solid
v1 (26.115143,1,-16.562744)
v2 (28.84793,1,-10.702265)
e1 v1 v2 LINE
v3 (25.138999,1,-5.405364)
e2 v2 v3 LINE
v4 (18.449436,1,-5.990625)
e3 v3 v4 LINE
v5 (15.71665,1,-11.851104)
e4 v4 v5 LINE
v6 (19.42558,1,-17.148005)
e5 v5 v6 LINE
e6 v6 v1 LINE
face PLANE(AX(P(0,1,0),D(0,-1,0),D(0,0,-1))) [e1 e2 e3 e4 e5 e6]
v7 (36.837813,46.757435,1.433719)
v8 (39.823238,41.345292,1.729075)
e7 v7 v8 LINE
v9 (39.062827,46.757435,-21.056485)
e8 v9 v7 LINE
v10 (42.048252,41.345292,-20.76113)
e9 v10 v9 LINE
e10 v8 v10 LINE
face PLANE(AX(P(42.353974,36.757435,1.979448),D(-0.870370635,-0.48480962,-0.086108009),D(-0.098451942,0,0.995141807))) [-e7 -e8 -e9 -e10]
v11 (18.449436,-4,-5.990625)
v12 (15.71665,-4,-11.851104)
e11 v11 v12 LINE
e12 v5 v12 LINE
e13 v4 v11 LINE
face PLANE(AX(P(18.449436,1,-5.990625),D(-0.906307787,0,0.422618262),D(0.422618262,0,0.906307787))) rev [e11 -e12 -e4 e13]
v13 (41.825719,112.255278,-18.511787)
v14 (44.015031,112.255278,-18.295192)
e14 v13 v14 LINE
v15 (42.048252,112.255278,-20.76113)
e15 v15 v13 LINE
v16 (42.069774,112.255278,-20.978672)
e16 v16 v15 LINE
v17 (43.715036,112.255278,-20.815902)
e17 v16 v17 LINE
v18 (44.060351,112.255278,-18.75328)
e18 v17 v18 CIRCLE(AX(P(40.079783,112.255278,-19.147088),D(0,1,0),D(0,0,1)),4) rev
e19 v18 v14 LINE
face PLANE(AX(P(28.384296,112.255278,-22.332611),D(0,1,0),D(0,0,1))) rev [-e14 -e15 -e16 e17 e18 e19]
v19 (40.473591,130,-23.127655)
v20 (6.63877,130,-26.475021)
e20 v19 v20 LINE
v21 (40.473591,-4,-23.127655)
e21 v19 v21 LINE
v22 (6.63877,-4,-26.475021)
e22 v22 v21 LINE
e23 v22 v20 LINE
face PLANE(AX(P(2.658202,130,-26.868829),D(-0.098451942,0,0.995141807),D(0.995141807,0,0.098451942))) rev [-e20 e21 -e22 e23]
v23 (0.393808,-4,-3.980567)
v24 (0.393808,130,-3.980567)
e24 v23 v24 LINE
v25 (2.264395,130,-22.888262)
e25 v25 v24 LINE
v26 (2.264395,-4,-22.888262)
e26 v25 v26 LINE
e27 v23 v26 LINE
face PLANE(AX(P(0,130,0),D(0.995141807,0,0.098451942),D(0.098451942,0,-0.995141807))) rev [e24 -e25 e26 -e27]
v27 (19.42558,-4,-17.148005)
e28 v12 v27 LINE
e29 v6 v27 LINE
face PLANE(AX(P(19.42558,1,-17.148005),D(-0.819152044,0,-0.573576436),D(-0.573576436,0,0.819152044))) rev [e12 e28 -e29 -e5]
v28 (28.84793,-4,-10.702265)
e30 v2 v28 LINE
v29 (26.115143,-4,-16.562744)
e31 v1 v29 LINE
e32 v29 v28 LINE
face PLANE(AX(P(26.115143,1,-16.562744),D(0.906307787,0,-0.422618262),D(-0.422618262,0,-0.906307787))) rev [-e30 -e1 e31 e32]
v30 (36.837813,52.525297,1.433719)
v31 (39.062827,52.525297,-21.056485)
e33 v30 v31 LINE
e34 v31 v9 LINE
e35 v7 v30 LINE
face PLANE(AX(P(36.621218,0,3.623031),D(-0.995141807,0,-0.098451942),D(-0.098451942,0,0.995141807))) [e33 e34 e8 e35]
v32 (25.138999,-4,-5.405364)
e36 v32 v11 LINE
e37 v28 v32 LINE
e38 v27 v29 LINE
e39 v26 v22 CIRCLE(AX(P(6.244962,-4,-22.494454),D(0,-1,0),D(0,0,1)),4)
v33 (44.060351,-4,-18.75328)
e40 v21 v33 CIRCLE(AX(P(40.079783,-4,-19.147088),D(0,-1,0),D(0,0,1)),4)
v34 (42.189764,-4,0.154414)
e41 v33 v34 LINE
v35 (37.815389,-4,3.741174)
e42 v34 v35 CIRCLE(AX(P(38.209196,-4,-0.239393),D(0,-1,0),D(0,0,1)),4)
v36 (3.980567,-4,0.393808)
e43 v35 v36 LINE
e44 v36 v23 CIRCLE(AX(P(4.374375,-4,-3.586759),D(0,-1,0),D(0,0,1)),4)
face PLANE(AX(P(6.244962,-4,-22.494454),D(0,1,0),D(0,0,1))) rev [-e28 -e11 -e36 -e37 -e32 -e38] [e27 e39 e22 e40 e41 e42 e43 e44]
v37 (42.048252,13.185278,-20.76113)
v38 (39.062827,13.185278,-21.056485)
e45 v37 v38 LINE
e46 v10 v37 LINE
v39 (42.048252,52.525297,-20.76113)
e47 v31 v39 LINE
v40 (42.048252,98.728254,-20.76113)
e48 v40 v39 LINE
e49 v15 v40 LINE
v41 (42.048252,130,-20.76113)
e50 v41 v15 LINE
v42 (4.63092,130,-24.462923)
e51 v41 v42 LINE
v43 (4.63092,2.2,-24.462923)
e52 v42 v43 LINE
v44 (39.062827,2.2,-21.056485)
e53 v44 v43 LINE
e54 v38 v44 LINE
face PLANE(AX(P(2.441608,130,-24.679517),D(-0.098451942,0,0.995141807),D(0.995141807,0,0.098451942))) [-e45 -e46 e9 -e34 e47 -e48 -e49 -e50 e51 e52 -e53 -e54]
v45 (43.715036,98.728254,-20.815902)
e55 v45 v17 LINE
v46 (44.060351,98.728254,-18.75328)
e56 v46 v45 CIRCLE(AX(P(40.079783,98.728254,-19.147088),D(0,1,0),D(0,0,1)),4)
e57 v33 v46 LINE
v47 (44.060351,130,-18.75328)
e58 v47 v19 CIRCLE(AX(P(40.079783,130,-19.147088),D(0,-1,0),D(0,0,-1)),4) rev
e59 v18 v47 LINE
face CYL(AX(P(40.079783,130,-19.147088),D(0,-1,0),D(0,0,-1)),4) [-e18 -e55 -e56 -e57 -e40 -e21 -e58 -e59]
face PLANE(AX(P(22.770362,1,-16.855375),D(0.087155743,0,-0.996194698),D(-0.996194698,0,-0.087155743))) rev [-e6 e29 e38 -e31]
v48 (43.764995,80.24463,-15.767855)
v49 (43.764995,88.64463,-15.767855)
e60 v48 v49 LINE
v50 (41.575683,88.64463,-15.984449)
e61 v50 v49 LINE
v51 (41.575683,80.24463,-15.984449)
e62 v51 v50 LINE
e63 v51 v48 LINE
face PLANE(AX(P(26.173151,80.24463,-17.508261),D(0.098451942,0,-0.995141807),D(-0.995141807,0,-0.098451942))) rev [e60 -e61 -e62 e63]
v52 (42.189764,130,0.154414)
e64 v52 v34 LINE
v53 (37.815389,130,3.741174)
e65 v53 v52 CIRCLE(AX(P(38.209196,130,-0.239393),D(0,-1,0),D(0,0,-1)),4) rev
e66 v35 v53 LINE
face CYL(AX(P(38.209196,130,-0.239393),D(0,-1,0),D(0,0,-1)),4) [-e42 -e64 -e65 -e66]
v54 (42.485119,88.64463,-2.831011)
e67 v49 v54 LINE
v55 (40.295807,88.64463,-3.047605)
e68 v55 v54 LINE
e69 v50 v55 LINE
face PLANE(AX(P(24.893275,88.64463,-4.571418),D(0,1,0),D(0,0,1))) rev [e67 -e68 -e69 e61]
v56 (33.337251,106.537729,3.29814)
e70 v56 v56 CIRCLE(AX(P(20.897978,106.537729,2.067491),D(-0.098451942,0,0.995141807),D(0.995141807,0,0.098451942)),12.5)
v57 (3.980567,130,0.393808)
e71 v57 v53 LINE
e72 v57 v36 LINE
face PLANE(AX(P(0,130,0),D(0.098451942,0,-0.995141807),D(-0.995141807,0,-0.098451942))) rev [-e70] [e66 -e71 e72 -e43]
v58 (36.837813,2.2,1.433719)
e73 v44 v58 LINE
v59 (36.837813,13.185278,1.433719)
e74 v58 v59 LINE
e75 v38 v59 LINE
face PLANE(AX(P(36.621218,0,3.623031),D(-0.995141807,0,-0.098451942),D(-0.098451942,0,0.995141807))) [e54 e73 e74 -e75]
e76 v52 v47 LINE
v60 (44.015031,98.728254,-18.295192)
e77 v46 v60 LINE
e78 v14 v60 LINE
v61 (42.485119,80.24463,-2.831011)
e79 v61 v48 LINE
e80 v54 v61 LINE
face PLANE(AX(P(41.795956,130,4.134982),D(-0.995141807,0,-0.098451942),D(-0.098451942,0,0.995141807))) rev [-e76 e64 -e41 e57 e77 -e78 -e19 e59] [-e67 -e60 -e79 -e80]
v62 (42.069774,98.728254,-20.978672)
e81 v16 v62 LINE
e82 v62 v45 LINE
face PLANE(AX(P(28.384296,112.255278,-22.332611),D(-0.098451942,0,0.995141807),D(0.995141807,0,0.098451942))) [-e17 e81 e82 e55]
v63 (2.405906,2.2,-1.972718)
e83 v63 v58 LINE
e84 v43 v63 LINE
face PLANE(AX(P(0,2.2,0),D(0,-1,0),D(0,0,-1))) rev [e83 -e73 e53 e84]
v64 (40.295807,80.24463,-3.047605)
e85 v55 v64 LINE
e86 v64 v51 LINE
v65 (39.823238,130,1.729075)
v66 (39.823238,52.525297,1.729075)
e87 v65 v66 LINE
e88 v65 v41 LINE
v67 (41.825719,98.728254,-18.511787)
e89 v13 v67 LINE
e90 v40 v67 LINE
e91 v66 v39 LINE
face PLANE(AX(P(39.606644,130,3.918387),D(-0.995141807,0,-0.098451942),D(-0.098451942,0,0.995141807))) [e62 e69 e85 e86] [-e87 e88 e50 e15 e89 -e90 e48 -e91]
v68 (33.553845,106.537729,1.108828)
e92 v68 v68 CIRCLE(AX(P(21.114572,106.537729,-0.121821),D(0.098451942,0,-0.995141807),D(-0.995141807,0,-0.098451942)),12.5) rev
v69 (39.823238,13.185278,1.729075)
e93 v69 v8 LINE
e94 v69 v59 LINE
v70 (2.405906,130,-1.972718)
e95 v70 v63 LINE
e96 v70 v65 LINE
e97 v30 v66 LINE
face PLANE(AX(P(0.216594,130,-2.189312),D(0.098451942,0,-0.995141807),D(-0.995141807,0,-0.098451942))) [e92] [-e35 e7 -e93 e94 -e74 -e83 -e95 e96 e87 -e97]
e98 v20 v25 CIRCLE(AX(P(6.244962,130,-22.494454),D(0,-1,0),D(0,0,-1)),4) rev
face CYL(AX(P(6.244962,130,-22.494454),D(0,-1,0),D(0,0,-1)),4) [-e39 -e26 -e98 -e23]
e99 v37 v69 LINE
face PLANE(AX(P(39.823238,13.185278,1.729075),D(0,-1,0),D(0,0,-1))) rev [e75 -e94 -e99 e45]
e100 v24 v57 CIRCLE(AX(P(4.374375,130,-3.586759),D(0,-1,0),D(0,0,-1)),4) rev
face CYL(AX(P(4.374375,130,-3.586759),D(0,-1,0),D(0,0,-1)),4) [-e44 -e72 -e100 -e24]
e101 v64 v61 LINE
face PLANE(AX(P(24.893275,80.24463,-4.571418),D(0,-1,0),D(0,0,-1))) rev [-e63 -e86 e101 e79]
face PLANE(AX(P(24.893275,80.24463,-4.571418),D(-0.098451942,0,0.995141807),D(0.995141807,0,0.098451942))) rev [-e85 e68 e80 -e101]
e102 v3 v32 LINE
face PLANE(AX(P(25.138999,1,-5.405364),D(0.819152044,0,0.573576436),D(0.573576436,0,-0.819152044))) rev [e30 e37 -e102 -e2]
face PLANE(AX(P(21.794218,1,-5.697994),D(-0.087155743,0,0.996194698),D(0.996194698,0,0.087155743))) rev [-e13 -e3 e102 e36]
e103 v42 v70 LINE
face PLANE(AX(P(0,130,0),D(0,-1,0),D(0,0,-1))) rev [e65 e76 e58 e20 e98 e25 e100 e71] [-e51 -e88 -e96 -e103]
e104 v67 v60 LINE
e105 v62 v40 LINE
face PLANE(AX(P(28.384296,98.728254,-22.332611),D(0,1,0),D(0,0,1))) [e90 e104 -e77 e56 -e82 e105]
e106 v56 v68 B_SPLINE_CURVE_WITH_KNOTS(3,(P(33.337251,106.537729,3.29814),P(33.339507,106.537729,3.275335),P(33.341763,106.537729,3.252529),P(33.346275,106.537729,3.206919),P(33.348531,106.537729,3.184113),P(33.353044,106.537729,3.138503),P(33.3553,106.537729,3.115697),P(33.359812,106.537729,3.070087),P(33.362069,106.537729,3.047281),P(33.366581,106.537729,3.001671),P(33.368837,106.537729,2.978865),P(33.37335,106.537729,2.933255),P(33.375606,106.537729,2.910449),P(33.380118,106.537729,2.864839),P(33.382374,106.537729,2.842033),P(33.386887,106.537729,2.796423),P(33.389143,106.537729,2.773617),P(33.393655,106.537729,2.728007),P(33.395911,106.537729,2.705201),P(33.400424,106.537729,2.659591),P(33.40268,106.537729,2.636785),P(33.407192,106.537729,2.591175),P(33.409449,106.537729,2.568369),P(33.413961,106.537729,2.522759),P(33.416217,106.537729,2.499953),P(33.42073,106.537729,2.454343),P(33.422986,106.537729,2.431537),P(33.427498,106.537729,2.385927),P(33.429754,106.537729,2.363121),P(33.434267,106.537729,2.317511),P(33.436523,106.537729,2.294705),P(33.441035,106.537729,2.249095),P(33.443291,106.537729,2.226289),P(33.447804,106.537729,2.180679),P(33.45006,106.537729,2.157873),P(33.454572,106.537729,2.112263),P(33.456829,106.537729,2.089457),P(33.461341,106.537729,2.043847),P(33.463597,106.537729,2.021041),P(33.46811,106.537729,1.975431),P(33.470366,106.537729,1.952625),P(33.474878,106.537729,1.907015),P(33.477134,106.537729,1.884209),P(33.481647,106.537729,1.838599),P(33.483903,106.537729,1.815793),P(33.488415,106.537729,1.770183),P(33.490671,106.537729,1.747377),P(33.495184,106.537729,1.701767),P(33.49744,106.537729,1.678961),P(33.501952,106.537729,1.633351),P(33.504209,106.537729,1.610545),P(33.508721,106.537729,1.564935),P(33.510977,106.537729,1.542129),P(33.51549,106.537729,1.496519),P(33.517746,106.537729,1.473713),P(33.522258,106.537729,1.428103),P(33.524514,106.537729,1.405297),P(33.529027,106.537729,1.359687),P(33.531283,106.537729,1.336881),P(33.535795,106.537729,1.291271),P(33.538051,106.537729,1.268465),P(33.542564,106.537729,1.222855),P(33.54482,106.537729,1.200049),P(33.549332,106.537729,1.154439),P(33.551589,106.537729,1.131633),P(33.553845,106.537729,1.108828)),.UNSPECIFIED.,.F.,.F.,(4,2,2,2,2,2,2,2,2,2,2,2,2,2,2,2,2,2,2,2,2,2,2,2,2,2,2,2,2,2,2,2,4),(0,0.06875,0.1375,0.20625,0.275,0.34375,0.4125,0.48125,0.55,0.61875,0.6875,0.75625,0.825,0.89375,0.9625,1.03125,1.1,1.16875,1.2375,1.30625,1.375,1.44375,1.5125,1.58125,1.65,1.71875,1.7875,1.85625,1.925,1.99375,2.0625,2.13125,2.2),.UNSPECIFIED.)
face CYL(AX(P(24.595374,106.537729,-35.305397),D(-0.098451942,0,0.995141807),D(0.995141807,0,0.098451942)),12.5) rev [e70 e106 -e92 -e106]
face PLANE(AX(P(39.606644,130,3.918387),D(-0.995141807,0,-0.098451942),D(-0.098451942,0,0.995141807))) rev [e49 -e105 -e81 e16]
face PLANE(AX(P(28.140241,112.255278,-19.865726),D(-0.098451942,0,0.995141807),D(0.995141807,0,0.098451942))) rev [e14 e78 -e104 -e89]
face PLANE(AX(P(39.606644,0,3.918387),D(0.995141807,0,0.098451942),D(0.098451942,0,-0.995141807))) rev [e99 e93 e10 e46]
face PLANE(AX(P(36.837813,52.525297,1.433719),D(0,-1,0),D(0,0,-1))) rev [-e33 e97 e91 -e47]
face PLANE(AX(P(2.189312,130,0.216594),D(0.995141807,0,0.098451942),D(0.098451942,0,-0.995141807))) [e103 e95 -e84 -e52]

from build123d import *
from build123d.topology import SkipClean

# Parameters (mm, degrees)
BOSS_EXTRUDE1_DEPTH = 130
SHELL1_T            = -2.2
SKETCH3_W           = 13
SKETCH3_H           = 8.4
CUT_EXTRUDE1_DEPTH  = 2.2
SKETCH6_W           = 2.478928052
SKETCH6_H           = 13.527023683
CUT_EXTRUDE2_DEPTH  = 2.2
SKETCH4_R           = 12.5
CUT_EXTRUDE3_DEPTH  = 2.2
FILLET1_R           = 4
SKETCH7_W           = 22.6
SKETCH7_H           = 50.325296996
BOSS_EXTRUDE2_DEPTH = 3
SKETCH8_W           = 22.6
SKETCH8_H           = 23.572157484
CUT_EXTRUDE4_DEPTH  = 3
CHAMFER1_SIZE       = 10
CHAMFER1_SIZE_2     = 5.543090515
BOSS_EXTRUDE3_START = 4
BOSS_EXTRUDE3_DEPTH = 4
CUT_EXTRUDE5_DEPTH  = 5


with BuildPart() as part:
    # Sketch1 → Boss-Extrude1 (new body)
    with BuildSketch(Plane(origin=(0, 0, 0), x_dir=(1, 0, 0), z_dir=(0, 1, 0))):
        Polygon((0, 0), (41.795955874, -4.134981567), (44.45415831, 22.733847209), (2.658202436, 26.868828776), align=None)
    extrude(amount=BOSS_EXTRUDE1_DEPTH)

    # Shell1
    shell1_openings = [part.faces().sort_by_distance(p)[0] for p in [
        (22.227079155, 130, -11.366923605),
    ]]
    offset(amount=SHELL1_T, openings=shell1_openings, kind=Kind.INTERSECTION)

    # Sketch3 → Cut-Extrude1 (cut)
    with BuildSketch(Plane(origin=(41.795955874, 0, 4.134981567), x_dir=(0.09845194207530276, 0, -0.9951418065288994), z_dir=(0.9951418065288994, 0, 0.09845194207530276))):
        with Locations((13.5, 84.444630111)):
            Rectangle(SKETCH3_W, SKETCH3_H)
    extrude(amount=-CUT_EXTRUDE1_DEPTH, mode=Mode.SUBTRACT)

    # Sketch6 → Cut-Extrude2 (cut)
    with BuildSketch(Plane(origin=(41.795955874, 0, 4.134981567), x_dir=(0.09845194207530188, 0, -0.9951418065288994), z_dir=(0.9951418065288995, 0, 0.09845194207530189))):
        with Locations((23.779140081, 105.491766173)):
            Rectangle(SKETCH6_W, SKETCH6_H)
    extrude(amount=-CUT_EXTRUDE2_DEPTH, mode=Mode.SUBTRACT)

    # Sketch4 → Cut-Extrude3 (cut)
    with BuildSketch(Plane(origin=(0, 0, 0), x_dir=(0.9951418065288994, 0, 0.0984519420753021), z_dir=(-0.09845194207530208, 0, 0.9951418065288993))):
        with Locations((21, 106.537728643)):
            Circle(SKETCH4_R)
    extrude(amount=-CUT_EXTRUDE3_DEPTH, mode=Mode.SUBTRACT)

    # Fillet1
    # the kernel refuses this fillet: 4 mm, written as the material it takes off along each edge
    with BuildSketch(Plane(origin=(2.658202436, -10, -26.868828776), x_dir=(-0.0984519420753019, 0, 0.9951418065288995), z_dir=(0, 1, 0)), Plane(origin=(0, -10, 0), x_dir=(0.9951418065288994, 0, 0.09845194207530183), z_dir=(0, 1, 0))) as fillet1_piece_1:
        with BuildLine():
            CenterArc((FILLET1_R, FILLET1_R), FILLET1_R, 180, 90)
            Line((0, FILLET1_R), (0, 0))
            Line((0, 0), (FILLET1_R, 0))
        make_face()
    extrude(amount=150, mode=Mode.SUBTRACT)
    with BuildSketch(Plane(origin=(44.45415831, -10, -22.733847209), x_dir=(-0.09845194207530218, 0, 0.9951418065288994), z_dir=(0, 1, 0)), Plane(origin=(41.795955874, -10, 4.134981567), x_dir=(-0.9951418065288994, 0, -0.09845194207530182), z_dir=(0, 1, 0))) as fillet1_piece_2:
        with BuildLine():
            CenterArc((FILLET1_R, -FILLET1_R), FILLET1_R, 90, 90)
            Line((0, -FILLET1_R), (0, 0))
            Line((0, 0), (FILLET1_R, 0))
        make_face()
    extrude(amount=150, mode=Mode.SUBTRACT)

    # Sketch7 → Boss-Extrude2 (add)
    with BuildSketch(Plane(origin=(39.6066439, 0, 3.918387295), x_dir=(-0.09845194207530197, 0, 0.9951418065288994), z_dir=(-0.9951418065288995, 0, -0.09845194207530199))):
        with Locations((-13.5, 27.362648498)):
            Rectangle(SKETCH7_W, SKETCH7_H)
    extrude(amount=BOSS_EXTRUDE2_DEPTH)

    # Sketch8 → Cut-Extrude4 (cut)
    with BuildSketch(Plane(origin=(36.62121848, 0, 3.623031468), x_dir=(-0.09845194207530192, 0, 0.9951418065288994), z_dir=(-0.9951418065288995, 0, -0.09845194207530193))):
        with Locations((-13.5, 24.971356382)):
            Rectangle(SKETCH8_W, SKETCH8_H)
    extrude(amount=-CUT_EXTRUDE4_DEPTH, mode=Mode.SUBTRACT)

    # Chamfer1
    # the kernel refuses this chamfer: 10, 5.543090515 mm, written as the material it takes off along each edge
    with BuildSketch(Plane(origin=(36.837812753, 36.757435124, 1.433719494), x_dir=(-0.018642579535210594, 0.9998245108869491, -0.0018443584105231356), z_dir=(0.09845194207530193, 0, -0.9951418065288995))) as chamfer1_piece_1_section:
        Polygon((CHAMFER1_SIZE * 0.999824510887, CHAMFER1_SIZE * 0.0187335909444), (-CHAMFER1_SIZE_2 * 0.0187335909428, CHAMFER1_SIZE_2 * 0.999824510802), (0, 0), align=None)
    chamfer1_piece_1 = extrude(amount=22.6, mode=Mode.PRIVATE)
    chamfer1_piece_1 = split(chamfer1_piece_1, bisect_by=Plane(origin=(40.104235357, 40.578335675, -1.111214466), z_dir=(-0.9951418065288995, 0, -0.09845194207530193)), keep=Keep.TOP, mode=Mode.PRIVATE)
    add(chamfer1_piece_1, mode=Mode.SUBTRACT)

    # Sketch9 → Boss-Extrude3 (add)
    with BuildSketch(Plane.XZ.offset(BOSS_EXTRUDE3_START)):
        with BuildLine():
            Line((6.638769662, -26.475021008), (40.473591084, -23.127654977))
            ThreePointArc((40.473591084, -23.127654977), (43.172933538, -21.683309686), (44.060350542, -18.753279983))
            Line((44.060350542, -18.753279983), (42.189763643, 0.154414341))
            ThreePointArc((42.189763643, 0.154414341), (40.745418352, 2.853756795), (37.815388648, 3.741173799))
            Line((37.815388648, 3.741173799), (3.980567226, 0.393807768))
            ThreePointArc((3.980567226, 0.393807768), (1.281224772, -1.050537523), (0.393807768, -3.980567226))
            Line((0.393807768, -3.980567226), (2.264394668, -22.88826155))
            ThreePointArc((2.264394668, -22.88826155), (3.708739959, -25.587604004), (6.638769662, -26.475021008))
        make_face()
    extrude(amount=-BOSS_EXTRUDE3_DEPTH)

    # Sketch11 → Cut-Extrude5 (cut)
    with SkipClean():  # the faces are left unmerged after this step: merging them gives an invalid solid
        with BuildSketch(Plane.XZ.offset(4)):
            Polygon((26.115143368, -16.562744329), (28.84792956, -10.702265428), (25.13899905, -5.405363713), (21.794217599, -5.697994172), (18.449436148, -5.990624631), (15.716649956, -11.851103531), (19.425580466, -17.148005247), (22.770361917, -16.855374788), align=None)
        extrude(amount=-CUT_EXTRUDE5_DEPTH, mode=Mode.SUBTRACT)


solid = part.part
